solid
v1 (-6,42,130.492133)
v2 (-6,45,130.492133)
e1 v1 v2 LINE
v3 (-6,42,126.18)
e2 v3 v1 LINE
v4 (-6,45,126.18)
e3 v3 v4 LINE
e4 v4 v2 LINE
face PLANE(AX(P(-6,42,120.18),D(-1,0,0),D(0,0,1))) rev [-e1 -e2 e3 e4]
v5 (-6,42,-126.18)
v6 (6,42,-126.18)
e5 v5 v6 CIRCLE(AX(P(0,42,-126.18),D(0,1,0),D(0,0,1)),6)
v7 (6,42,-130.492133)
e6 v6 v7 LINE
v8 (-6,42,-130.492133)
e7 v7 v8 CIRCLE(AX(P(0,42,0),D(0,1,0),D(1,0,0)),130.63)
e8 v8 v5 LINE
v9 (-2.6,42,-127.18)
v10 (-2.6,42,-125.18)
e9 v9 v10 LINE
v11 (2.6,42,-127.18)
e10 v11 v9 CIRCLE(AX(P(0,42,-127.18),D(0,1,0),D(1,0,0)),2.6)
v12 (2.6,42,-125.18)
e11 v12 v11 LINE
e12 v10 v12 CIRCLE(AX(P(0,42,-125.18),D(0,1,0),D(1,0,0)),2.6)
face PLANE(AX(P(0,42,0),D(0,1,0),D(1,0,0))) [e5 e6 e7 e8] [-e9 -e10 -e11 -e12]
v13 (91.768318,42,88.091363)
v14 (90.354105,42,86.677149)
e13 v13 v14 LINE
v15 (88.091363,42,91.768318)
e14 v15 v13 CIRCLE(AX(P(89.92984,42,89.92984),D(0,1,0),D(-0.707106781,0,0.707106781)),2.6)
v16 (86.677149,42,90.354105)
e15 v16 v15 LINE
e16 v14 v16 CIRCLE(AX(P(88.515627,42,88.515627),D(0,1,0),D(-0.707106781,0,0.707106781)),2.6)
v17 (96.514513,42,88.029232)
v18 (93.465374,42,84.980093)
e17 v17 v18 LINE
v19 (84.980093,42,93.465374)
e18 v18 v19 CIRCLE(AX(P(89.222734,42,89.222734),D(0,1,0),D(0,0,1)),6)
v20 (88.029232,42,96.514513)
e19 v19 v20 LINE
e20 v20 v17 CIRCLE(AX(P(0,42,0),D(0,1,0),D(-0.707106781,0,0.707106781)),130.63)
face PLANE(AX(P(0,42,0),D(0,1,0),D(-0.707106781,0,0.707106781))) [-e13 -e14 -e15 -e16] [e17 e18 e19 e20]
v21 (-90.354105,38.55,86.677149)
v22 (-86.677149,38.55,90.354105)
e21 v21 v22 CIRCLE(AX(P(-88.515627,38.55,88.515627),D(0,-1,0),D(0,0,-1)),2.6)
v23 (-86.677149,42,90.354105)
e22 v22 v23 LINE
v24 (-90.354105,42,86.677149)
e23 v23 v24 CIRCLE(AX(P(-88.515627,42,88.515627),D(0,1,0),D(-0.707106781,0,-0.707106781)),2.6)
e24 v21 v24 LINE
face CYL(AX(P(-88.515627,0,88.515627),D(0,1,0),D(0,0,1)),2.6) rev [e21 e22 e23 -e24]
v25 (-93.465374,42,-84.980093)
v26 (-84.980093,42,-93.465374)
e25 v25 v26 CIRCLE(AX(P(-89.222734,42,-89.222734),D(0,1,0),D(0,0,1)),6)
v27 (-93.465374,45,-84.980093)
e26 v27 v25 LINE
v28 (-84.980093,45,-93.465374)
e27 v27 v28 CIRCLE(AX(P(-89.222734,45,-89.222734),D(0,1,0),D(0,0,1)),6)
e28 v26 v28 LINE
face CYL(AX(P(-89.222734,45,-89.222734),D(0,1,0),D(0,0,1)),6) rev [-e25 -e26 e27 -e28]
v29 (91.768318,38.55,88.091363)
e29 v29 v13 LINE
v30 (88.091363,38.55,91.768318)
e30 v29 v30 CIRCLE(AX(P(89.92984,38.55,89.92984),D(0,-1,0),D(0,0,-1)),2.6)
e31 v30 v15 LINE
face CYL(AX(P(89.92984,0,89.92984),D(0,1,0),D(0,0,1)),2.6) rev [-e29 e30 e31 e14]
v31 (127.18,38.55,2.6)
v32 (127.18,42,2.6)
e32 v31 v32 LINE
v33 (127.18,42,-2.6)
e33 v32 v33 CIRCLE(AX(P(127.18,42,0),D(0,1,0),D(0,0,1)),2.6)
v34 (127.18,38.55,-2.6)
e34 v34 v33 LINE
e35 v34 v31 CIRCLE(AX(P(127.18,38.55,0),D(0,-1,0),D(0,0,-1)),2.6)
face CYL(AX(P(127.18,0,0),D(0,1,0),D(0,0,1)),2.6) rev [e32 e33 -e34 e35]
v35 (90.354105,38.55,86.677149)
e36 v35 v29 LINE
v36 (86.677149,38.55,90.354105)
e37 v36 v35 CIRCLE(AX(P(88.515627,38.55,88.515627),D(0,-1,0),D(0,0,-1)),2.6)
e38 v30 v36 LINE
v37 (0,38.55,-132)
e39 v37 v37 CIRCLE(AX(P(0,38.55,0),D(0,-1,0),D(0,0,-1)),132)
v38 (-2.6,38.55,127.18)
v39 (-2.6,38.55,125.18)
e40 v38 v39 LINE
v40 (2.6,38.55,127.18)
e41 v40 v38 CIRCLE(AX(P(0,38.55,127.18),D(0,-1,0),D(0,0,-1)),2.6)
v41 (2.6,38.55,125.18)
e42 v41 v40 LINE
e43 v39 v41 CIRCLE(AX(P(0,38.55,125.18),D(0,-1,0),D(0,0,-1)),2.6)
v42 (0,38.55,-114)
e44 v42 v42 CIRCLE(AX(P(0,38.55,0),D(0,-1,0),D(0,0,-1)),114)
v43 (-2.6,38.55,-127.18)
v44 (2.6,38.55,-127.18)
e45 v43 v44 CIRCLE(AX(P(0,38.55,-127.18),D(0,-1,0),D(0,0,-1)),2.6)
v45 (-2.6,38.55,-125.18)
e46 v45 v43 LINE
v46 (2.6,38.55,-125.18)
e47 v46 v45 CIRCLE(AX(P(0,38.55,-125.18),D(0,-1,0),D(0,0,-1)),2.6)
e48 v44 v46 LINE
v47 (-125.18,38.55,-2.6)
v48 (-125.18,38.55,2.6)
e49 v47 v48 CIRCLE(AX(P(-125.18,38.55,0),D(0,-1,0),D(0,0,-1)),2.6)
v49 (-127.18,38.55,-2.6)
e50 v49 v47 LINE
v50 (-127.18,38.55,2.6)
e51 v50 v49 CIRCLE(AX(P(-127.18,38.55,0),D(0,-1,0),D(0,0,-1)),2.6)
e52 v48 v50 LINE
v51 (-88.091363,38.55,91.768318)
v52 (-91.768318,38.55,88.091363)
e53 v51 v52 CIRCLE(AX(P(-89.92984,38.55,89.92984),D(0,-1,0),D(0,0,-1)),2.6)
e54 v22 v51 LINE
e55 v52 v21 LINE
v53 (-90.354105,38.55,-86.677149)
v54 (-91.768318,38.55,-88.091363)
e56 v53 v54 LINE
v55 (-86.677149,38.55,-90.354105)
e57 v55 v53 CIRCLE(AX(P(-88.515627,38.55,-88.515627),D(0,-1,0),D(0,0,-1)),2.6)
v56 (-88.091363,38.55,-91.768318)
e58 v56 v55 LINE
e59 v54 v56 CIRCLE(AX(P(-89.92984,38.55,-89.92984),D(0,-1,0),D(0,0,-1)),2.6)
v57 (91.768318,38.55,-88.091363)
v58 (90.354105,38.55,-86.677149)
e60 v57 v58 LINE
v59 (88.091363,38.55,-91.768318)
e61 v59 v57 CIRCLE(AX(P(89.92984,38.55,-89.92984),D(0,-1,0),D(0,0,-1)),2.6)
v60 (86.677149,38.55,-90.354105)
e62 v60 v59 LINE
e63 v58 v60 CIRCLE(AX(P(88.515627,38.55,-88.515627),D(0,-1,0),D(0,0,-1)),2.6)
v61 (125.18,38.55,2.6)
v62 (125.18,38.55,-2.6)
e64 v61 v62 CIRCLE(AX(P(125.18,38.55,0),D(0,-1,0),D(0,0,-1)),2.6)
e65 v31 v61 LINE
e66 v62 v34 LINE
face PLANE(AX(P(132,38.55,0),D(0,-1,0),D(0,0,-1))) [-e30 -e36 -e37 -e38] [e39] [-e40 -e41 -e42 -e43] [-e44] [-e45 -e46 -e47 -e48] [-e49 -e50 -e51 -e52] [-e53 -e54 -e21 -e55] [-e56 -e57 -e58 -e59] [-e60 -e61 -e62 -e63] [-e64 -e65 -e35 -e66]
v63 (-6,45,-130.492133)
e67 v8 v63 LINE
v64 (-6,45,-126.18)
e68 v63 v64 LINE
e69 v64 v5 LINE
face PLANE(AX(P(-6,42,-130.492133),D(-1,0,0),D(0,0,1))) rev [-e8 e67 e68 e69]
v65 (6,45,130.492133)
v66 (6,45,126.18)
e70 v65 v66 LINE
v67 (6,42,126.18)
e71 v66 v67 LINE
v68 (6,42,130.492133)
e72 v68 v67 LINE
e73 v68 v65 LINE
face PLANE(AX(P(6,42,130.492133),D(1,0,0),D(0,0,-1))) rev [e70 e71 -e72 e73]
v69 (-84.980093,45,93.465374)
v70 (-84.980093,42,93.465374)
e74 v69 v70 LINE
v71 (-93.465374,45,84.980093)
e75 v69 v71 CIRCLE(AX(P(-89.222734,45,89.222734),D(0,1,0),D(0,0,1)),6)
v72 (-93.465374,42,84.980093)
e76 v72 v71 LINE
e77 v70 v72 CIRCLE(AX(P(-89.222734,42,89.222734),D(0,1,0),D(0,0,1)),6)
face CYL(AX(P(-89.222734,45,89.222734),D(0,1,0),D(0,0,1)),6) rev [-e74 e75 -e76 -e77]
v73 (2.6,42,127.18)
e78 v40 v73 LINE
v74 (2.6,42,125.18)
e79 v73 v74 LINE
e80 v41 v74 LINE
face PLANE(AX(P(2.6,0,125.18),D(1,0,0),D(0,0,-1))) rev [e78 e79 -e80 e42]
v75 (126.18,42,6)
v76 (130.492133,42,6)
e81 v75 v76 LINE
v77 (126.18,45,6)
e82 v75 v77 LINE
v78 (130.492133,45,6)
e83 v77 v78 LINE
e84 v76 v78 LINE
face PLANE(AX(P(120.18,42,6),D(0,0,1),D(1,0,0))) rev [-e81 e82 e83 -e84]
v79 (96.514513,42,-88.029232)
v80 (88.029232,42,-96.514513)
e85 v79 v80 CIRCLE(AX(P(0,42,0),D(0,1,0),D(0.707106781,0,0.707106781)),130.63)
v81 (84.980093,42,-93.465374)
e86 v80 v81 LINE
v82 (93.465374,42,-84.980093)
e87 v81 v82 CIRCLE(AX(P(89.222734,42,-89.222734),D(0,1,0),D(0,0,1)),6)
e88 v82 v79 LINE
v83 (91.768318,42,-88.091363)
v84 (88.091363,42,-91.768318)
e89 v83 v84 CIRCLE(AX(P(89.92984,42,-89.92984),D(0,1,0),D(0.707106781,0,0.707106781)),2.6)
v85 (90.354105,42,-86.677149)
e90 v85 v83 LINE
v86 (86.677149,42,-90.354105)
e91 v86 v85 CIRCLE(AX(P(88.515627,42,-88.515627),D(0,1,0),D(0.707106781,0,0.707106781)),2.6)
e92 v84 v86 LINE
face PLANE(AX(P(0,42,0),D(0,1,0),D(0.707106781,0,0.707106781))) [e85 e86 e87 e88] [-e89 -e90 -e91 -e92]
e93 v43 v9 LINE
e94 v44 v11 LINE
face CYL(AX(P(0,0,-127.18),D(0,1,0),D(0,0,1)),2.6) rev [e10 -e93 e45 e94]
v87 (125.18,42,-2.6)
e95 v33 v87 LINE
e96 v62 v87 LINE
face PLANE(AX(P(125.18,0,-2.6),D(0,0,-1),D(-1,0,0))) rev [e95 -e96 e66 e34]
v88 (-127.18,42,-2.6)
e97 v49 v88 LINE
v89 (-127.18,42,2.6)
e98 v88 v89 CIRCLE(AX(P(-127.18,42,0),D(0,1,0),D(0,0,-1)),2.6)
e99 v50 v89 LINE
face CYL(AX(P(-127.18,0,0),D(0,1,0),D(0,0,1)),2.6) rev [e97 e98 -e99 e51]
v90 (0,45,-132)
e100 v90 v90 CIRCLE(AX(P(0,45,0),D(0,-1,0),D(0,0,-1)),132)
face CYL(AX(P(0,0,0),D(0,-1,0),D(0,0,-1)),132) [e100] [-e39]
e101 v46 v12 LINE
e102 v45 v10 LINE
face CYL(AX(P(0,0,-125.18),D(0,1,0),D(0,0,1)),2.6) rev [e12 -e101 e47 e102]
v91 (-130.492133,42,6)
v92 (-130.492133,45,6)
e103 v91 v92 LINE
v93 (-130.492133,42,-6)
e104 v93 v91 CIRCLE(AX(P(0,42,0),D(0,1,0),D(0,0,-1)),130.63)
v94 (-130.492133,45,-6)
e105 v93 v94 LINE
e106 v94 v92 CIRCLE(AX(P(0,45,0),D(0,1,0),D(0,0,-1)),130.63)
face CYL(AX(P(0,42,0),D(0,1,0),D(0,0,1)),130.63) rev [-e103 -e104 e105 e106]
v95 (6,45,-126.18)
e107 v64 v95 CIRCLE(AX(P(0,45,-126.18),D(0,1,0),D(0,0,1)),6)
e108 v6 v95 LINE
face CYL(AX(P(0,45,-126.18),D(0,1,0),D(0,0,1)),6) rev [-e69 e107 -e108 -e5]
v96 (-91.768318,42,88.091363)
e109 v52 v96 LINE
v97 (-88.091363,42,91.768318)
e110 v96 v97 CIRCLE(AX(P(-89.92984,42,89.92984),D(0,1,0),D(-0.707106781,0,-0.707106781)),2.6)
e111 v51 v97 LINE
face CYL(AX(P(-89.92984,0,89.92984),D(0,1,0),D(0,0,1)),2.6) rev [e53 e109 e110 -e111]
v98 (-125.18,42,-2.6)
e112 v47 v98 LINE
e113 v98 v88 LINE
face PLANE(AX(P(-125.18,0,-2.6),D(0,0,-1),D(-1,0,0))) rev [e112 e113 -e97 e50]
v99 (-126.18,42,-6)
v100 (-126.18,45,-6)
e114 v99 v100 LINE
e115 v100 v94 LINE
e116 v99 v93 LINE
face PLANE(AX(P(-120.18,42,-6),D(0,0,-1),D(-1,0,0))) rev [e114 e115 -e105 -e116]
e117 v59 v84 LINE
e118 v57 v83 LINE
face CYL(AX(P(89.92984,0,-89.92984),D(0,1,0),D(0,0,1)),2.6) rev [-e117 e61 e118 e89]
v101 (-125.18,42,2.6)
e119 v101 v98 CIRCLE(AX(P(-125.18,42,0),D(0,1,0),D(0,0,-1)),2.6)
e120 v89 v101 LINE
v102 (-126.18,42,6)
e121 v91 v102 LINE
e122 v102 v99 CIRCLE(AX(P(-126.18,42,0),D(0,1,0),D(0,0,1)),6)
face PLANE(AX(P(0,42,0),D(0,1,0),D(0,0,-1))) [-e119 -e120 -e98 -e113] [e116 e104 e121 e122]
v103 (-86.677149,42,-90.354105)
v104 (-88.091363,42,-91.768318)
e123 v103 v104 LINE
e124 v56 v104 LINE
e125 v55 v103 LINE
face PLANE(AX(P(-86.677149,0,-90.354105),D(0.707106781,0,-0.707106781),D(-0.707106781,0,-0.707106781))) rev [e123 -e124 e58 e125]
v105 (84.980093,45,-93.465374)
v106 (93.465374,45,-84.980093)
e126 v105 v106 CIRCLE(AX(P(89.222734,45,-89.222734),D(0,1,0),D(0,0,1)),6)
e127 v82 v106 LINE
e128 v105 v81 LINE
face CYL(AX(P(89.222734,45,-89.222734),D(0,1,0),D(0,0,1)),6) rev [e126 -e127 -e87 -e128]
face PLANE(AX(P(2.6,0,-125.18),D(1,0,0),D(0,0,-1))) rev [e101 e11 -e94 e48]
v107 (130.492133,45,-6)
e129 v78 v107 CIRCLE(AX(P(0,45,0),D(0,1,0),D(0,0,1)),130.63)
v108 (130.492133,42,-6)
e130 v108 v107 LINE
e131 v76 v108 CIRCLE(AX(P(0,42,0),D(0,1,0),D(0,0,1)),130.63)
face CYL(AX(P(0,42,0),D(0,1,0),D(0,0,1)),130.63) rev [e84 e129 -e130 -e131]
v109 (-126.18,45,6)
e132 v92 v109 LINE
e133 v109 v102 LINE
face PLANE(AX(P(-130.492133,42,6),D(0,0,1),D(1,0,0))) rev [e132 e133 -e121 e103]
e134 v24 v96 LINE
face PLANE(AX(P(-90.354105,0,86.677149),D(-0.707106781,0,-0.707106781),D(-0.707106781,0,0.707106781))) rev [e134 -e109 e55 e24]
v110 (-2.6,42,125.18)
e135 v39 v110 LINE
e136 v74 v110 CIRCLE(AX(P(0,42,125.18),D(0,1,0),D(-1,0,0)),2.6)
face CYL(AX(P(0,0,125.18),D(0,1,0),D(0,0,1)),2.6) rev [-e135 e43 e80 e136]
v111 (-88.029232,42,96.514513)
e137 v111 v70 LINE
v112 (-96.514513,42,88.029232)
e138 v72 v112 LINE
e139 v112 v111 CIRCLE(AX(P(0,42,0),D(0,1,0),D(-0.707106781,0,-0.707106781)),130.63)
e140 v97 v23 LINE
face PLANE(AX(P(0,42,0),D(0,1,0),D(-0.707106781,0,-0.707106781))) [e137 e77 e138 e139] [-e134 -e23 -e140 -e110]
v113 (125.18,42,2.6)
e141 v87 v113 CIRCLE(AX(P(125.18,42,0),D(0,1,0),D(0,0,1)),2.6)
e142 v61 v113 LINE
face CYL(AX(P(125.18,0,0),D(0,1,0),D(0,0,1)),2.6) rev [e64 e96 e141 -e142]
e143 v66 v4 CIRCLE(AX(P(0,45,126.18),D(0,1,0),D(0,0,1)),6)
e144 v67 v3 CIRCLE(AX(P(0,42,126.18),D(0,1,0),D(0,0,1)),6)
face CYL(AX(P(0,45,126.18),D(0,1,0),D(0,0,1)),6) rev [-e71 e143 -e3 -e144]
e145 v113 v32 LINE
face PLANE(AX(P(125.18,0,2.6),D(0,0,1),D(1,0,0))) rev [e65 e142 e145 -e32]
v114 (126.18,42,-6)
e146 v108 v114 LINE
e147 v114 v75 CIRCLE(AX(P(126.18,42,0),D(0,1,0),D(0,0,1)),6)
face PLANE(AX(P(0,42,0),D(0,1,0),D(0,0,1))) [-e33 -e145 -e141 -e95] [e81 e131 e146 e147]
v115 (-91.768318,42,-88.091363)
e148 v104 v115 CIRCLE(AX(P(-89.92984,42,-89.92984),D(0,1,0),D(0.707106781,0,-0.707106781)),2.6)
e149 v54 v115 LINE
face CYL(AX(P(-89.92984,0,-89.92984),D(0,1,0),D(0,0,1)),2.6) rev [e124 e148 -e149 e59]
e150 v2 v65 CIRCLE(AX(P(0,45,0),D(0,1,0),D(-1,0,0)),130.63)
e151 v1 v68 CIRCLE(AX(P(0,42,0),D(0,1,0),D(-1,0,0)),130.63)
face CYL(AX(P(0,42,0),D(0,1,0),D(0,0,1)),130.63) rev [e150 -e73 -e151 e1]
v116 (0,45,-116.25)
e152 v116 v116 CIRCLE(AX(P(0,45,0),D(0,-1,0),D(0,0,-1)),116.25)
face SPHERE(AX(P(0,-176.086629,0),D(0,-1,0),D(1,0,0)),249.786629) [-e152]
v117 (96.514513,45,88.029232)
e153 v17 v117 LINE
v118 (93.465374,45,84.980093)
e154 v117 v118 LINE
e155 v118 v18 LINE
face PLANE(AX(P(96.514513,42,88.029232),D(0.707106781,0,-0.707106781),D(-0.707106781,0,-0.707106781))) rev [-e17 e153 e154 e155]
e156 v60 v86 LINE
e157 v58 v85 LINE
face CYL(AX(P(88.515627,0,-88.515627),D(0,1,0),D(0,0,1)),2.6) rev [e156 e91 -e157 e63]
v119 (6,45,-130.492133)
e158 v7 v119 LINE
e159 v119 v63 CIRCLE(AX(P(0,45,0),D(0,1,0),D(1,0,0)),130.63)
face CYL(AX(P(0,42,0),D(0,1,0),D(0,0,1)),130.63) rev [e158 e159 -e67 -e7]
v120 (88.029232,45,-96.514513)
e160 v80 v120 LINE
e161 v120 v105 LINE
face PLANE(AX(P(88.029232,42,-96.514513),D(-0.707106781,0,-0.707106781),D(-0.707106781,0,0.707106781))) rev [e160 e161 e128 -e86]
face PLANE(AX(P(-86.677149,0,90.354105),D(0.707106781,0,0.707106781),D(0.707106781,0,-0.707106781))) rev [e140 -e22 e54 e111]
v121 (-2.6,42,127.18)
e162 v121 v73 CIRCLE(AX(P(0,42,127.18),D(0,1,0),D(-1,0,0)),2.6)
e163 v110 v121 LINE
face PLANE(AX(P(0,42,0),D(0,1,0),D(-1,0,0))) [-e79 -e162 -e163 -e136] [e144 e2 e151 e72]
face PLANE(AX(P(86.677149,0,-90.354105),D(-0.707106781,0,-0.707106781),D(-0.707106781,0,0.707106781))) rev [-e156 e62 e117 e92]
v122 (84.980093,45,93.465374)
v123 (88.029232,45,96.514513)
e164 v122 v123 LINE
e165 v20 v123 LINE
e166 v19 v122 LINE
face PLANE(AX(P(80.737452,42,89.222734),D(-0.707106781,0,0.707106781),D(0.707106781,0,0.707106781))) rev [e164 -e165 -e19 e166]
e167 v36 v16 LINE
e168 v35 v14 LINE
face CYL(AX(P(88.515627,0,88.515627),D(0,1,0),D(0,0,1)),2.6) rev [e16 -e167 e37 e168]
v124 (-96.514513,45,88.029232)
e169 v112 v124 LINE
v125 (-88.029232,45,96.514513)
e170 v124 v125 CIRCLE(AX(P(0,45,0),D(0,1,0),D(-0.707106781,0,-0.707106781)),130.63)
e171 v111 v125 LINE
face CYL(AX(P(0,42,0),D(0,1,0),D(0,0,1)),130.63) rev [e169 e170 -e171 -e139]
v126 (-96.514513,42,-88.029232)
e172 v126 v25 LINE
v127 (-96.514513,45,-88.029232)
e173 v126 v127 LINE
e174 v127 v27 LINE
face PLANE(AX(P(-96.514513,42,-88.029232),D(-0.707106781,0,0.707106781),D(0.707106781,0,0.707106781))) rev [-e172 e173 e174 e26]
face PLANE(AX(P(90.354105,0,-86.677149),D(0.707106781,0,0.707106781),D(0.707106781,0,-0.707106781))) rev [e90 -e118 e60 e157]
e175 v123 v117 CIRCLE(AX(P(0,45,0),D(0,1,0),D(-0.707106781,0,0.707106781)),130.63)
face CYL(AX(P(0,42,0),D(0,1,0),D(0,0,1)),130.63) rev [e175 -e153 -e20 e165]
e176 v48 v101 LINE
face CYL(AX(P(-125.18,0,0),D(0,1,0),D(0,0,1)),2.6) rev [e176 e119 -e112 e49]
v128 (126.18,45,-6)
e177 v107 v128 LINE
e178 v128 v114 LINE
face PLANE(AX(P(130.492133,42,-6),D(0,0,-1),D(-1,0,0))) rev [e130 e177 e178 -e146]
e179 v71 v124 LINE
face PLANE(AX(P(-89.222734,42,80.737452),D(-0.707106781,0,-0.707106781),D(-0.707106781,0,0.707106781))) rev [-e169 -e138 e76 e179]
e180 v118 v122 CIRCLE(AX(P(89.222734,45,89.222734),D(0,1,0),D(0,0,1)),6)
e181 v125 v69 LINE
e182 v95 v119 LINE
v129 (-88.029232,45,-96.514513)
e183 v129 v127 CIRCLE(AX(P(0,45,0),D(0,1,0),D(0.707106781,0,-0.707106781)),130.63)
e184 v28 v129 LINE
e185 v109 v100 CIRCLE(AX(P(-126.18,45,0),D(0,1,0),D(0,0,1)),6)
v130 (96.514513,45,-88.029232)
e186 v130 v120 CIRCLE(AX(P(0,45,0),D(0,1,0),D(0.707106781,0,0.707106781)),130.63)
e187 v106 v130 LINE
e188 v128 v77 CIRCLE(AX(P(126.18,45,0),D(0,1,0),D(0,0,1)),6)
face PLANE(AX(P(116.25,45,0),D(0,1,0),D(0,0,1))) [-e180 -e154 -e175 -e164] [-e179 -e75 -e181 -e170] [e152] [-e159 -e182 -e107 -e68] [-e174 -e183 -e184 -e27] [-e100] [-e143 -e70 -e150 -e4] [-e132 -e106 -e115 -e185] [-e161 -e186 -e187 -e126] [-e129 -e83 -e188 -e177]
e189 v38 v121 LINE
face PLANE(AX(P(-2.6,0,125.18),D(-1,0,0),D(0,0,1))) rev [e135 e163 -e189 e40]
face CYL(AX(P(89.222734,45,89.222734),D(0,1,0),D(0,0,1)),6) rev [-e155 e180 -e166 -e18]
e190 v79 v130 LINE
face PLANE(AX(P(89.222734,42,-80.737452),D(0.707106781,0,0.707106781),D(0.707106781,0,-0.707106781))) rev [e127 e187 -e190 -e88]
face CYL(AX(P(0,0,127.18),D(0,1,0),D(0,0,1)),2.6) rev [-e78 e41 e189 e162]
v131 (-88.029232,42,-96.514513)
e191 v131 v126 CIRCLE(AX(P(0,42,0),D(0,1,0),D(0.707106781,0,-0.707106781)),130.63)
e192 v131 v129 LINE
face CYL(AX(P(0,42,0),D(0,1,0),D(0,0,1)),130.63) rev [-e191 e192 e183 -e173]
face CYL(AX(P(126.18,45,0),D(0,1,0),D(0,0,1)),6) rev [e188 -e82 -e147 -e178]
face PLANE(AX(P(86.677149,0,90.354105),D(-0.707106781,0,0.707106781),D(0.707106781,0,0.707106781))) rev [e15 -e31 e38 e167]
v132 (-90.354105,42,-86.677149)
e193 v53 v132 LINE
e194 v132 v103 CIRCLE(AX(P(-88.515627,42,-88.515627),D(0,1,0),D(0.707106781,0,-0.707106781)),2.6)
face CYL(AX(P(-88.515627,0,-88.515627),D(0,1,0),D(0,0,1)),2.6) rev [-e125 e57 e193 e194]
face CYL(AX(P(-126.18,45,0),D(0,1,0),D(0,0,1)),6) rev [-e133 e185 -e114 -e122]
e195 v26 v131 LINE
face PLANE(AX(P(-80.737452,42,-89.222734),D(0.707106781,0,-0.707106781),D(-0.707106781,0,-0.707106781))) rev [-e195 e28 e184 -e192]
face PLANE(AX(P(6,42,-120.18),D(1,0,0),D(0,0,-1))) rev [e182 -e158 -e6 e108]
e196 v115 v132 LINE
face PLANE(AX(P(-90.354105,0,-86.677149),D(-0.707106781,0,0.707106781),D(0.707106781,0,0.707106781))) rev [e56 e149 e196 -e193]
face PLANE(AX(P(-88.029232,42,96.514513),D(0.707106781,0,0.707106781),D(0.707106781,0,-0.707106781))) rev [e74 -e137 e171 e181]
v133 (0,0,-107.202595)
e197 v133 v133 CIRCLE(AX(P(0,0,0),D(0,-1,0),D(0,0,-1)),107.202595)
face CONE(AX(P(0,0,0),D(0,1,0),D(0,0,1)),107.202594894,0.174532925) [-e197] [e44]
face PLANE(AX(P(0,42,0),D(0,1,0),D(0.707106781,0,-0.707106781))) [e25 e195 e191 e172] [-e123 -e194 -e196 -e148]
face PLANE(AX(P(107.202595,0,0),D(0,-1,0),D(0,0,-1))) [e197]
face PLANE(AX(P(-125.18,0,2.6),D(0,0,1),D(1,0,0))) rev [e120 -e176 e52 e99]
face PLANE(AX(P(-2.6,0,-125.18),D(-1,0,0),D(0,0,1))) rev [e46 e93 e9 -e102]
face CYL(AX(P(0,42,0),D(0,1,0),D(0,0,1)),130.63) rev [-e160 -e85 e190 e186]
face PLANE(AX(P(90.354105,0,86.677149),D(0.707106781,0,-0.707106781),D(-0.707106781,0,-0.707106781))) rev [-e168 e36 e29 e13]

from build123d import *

# Parameters (mm, degrees)
CUT_EXTRUDE1_DEPTH       = 3
FILLET1_R                = 6
CUT_EXTRUDE2_DEPTH       = 192.342624629
CIRPATTERN2_COUNT        = 8
FILLET1_OF_CIRPATTERN2_R = 6


with BuildPart() as part:
    # Sketch1 → Revolve1 (revolve)
    with BuildSketch(Plane.XY, mode=Mode.PRIVATE) as revolve1_sk:
        with BuildLine():
            Line((116.25, 45), (132, 45))
            Line((132, 45), (132, 38.55))
            Line((132, 38.55), (114, 38.55))
            Line((114, 38.55), (107.202594894, 0))
            Line((107.202594894, 0), (0, 0))
            Line((0, 0), (0, 73.7))
            ThreePointArc((0, 73.7), (59.870177259, 66.418880012), (116.25, 45))
        make_face()
    revolve(revolve1_sk.sketch.rotate(Axis((0, 0, 0), (0, 1, 0)), 90), axis=Axis((0, 0, 0), (0, 1, 0)))

    # Sketch2 → Cut-Extrude1 (cut)
    with BuildSketch(Plane(origin=(0, 45, 0), x_dir=(1, 0, 0), z_dir=(0, 1, 0))):
        with BuildLine():
            Line((130.492133479, 6), (120.18, 6))
            Line((120.18, 6), (120.18, -6))
            Line((120.18, -6), (130.492133479, -6))
            ThreePointArc((130.492133479, -6), (130.63, 0), (130.492133479, 6))
        make_face()
    cut_extrude1 = extrude(amount=-CUT_EXTRUDE1_DEPTH, mode=Mode.SUBTRACT)

    # Fillet1
    fillet1_edges = [part.edges().sort_by_distance(p)[0] for p in [
        (120.18, 43.5, 6),
        (120.18, 43.5, -6),
    ]]
    fillet(fillet1_edges, radius=FILLET1_R - 0.0001)  # a hair under: the kernel refuses the full size

    # Sketch3 → Cut-Extrude2 (cut, through all)
    with BuildSketch(Plane(origin=(0, 42, 0), x_dir=(1, 0, 0), z_dir=(0, 1, 0))):
        with BuildLine():
            Line((125.18, 2.6), (127.18, 2.6))
            ThreePointArc((127.18, 2.6), (129.78, 0), (127.18, -2.6))
            Line((127.18, -2.6), (125.18, -2.6))
            ThreePointArc((125.18, -2.6), (122.58, 0), (125.18, 2.6))
        make_face()
    cut_extrude2 = extrude(amount=-CUT_EXTRUDE2_DEPTH, mode=Mode.SUBTRACT)

    # CirPattern2: Cut-Extrude1, Cut-Extrude2 ×8 about axis
    cirpattern2_axis = Axis((0, 0, 0), (0, 1, 0))
    add([cut_extrude1.rotate(cirpattern2_axis, i * 360 / CIRPATTERN2_COUNT) for i in range(1, CIRPATTERN2_COUNT)], mode=Mode.SUBTRACT)
    add([cut_extrude2.rotate(cirpattern2_axis, i * 360 / CIRPATTERN2_COUNT) for i in range(1, CIRPATTERN2_COUNT)], mode=Mode.SUBTRACT)

    # Fillet1 of CirPattern2
    fillet1_of_cirpattern2_edges = [part.edges().sort_by_distance(p)[0] for p in [
        (89.22273365, 43.5, -80.737452276),
        (80.737452276, 43.5, -89.22273365),
        (6, 43.5, -120.18),
        (-6, 43.5, -120.18),
        (-80.737452276, 43.5, -89.22273365),
        (-89.22273365, 43.5, -80.737452276),
        (-120.18, 43.5, -6),
        (-120.18, 43.5, 6),
        (-89.22273365, 43.5, 80.737452276),
        (-80.737452276, 43.5, 89.22273365),
        (-6, 43.5, 120.18),
        (6, 43.5, 120.18),
        (80.737452276, 43.5, 89.22273365),
        (89.22273365, 43.5, 80.737452276),
    ]]
    fillet(fillet1_of_cirpattern2_edges, radius=FILLET1_OF_CIRPATTERN2_R - 0.0001)  # a hair under: the kernel refuses the full size


solid = part.part
